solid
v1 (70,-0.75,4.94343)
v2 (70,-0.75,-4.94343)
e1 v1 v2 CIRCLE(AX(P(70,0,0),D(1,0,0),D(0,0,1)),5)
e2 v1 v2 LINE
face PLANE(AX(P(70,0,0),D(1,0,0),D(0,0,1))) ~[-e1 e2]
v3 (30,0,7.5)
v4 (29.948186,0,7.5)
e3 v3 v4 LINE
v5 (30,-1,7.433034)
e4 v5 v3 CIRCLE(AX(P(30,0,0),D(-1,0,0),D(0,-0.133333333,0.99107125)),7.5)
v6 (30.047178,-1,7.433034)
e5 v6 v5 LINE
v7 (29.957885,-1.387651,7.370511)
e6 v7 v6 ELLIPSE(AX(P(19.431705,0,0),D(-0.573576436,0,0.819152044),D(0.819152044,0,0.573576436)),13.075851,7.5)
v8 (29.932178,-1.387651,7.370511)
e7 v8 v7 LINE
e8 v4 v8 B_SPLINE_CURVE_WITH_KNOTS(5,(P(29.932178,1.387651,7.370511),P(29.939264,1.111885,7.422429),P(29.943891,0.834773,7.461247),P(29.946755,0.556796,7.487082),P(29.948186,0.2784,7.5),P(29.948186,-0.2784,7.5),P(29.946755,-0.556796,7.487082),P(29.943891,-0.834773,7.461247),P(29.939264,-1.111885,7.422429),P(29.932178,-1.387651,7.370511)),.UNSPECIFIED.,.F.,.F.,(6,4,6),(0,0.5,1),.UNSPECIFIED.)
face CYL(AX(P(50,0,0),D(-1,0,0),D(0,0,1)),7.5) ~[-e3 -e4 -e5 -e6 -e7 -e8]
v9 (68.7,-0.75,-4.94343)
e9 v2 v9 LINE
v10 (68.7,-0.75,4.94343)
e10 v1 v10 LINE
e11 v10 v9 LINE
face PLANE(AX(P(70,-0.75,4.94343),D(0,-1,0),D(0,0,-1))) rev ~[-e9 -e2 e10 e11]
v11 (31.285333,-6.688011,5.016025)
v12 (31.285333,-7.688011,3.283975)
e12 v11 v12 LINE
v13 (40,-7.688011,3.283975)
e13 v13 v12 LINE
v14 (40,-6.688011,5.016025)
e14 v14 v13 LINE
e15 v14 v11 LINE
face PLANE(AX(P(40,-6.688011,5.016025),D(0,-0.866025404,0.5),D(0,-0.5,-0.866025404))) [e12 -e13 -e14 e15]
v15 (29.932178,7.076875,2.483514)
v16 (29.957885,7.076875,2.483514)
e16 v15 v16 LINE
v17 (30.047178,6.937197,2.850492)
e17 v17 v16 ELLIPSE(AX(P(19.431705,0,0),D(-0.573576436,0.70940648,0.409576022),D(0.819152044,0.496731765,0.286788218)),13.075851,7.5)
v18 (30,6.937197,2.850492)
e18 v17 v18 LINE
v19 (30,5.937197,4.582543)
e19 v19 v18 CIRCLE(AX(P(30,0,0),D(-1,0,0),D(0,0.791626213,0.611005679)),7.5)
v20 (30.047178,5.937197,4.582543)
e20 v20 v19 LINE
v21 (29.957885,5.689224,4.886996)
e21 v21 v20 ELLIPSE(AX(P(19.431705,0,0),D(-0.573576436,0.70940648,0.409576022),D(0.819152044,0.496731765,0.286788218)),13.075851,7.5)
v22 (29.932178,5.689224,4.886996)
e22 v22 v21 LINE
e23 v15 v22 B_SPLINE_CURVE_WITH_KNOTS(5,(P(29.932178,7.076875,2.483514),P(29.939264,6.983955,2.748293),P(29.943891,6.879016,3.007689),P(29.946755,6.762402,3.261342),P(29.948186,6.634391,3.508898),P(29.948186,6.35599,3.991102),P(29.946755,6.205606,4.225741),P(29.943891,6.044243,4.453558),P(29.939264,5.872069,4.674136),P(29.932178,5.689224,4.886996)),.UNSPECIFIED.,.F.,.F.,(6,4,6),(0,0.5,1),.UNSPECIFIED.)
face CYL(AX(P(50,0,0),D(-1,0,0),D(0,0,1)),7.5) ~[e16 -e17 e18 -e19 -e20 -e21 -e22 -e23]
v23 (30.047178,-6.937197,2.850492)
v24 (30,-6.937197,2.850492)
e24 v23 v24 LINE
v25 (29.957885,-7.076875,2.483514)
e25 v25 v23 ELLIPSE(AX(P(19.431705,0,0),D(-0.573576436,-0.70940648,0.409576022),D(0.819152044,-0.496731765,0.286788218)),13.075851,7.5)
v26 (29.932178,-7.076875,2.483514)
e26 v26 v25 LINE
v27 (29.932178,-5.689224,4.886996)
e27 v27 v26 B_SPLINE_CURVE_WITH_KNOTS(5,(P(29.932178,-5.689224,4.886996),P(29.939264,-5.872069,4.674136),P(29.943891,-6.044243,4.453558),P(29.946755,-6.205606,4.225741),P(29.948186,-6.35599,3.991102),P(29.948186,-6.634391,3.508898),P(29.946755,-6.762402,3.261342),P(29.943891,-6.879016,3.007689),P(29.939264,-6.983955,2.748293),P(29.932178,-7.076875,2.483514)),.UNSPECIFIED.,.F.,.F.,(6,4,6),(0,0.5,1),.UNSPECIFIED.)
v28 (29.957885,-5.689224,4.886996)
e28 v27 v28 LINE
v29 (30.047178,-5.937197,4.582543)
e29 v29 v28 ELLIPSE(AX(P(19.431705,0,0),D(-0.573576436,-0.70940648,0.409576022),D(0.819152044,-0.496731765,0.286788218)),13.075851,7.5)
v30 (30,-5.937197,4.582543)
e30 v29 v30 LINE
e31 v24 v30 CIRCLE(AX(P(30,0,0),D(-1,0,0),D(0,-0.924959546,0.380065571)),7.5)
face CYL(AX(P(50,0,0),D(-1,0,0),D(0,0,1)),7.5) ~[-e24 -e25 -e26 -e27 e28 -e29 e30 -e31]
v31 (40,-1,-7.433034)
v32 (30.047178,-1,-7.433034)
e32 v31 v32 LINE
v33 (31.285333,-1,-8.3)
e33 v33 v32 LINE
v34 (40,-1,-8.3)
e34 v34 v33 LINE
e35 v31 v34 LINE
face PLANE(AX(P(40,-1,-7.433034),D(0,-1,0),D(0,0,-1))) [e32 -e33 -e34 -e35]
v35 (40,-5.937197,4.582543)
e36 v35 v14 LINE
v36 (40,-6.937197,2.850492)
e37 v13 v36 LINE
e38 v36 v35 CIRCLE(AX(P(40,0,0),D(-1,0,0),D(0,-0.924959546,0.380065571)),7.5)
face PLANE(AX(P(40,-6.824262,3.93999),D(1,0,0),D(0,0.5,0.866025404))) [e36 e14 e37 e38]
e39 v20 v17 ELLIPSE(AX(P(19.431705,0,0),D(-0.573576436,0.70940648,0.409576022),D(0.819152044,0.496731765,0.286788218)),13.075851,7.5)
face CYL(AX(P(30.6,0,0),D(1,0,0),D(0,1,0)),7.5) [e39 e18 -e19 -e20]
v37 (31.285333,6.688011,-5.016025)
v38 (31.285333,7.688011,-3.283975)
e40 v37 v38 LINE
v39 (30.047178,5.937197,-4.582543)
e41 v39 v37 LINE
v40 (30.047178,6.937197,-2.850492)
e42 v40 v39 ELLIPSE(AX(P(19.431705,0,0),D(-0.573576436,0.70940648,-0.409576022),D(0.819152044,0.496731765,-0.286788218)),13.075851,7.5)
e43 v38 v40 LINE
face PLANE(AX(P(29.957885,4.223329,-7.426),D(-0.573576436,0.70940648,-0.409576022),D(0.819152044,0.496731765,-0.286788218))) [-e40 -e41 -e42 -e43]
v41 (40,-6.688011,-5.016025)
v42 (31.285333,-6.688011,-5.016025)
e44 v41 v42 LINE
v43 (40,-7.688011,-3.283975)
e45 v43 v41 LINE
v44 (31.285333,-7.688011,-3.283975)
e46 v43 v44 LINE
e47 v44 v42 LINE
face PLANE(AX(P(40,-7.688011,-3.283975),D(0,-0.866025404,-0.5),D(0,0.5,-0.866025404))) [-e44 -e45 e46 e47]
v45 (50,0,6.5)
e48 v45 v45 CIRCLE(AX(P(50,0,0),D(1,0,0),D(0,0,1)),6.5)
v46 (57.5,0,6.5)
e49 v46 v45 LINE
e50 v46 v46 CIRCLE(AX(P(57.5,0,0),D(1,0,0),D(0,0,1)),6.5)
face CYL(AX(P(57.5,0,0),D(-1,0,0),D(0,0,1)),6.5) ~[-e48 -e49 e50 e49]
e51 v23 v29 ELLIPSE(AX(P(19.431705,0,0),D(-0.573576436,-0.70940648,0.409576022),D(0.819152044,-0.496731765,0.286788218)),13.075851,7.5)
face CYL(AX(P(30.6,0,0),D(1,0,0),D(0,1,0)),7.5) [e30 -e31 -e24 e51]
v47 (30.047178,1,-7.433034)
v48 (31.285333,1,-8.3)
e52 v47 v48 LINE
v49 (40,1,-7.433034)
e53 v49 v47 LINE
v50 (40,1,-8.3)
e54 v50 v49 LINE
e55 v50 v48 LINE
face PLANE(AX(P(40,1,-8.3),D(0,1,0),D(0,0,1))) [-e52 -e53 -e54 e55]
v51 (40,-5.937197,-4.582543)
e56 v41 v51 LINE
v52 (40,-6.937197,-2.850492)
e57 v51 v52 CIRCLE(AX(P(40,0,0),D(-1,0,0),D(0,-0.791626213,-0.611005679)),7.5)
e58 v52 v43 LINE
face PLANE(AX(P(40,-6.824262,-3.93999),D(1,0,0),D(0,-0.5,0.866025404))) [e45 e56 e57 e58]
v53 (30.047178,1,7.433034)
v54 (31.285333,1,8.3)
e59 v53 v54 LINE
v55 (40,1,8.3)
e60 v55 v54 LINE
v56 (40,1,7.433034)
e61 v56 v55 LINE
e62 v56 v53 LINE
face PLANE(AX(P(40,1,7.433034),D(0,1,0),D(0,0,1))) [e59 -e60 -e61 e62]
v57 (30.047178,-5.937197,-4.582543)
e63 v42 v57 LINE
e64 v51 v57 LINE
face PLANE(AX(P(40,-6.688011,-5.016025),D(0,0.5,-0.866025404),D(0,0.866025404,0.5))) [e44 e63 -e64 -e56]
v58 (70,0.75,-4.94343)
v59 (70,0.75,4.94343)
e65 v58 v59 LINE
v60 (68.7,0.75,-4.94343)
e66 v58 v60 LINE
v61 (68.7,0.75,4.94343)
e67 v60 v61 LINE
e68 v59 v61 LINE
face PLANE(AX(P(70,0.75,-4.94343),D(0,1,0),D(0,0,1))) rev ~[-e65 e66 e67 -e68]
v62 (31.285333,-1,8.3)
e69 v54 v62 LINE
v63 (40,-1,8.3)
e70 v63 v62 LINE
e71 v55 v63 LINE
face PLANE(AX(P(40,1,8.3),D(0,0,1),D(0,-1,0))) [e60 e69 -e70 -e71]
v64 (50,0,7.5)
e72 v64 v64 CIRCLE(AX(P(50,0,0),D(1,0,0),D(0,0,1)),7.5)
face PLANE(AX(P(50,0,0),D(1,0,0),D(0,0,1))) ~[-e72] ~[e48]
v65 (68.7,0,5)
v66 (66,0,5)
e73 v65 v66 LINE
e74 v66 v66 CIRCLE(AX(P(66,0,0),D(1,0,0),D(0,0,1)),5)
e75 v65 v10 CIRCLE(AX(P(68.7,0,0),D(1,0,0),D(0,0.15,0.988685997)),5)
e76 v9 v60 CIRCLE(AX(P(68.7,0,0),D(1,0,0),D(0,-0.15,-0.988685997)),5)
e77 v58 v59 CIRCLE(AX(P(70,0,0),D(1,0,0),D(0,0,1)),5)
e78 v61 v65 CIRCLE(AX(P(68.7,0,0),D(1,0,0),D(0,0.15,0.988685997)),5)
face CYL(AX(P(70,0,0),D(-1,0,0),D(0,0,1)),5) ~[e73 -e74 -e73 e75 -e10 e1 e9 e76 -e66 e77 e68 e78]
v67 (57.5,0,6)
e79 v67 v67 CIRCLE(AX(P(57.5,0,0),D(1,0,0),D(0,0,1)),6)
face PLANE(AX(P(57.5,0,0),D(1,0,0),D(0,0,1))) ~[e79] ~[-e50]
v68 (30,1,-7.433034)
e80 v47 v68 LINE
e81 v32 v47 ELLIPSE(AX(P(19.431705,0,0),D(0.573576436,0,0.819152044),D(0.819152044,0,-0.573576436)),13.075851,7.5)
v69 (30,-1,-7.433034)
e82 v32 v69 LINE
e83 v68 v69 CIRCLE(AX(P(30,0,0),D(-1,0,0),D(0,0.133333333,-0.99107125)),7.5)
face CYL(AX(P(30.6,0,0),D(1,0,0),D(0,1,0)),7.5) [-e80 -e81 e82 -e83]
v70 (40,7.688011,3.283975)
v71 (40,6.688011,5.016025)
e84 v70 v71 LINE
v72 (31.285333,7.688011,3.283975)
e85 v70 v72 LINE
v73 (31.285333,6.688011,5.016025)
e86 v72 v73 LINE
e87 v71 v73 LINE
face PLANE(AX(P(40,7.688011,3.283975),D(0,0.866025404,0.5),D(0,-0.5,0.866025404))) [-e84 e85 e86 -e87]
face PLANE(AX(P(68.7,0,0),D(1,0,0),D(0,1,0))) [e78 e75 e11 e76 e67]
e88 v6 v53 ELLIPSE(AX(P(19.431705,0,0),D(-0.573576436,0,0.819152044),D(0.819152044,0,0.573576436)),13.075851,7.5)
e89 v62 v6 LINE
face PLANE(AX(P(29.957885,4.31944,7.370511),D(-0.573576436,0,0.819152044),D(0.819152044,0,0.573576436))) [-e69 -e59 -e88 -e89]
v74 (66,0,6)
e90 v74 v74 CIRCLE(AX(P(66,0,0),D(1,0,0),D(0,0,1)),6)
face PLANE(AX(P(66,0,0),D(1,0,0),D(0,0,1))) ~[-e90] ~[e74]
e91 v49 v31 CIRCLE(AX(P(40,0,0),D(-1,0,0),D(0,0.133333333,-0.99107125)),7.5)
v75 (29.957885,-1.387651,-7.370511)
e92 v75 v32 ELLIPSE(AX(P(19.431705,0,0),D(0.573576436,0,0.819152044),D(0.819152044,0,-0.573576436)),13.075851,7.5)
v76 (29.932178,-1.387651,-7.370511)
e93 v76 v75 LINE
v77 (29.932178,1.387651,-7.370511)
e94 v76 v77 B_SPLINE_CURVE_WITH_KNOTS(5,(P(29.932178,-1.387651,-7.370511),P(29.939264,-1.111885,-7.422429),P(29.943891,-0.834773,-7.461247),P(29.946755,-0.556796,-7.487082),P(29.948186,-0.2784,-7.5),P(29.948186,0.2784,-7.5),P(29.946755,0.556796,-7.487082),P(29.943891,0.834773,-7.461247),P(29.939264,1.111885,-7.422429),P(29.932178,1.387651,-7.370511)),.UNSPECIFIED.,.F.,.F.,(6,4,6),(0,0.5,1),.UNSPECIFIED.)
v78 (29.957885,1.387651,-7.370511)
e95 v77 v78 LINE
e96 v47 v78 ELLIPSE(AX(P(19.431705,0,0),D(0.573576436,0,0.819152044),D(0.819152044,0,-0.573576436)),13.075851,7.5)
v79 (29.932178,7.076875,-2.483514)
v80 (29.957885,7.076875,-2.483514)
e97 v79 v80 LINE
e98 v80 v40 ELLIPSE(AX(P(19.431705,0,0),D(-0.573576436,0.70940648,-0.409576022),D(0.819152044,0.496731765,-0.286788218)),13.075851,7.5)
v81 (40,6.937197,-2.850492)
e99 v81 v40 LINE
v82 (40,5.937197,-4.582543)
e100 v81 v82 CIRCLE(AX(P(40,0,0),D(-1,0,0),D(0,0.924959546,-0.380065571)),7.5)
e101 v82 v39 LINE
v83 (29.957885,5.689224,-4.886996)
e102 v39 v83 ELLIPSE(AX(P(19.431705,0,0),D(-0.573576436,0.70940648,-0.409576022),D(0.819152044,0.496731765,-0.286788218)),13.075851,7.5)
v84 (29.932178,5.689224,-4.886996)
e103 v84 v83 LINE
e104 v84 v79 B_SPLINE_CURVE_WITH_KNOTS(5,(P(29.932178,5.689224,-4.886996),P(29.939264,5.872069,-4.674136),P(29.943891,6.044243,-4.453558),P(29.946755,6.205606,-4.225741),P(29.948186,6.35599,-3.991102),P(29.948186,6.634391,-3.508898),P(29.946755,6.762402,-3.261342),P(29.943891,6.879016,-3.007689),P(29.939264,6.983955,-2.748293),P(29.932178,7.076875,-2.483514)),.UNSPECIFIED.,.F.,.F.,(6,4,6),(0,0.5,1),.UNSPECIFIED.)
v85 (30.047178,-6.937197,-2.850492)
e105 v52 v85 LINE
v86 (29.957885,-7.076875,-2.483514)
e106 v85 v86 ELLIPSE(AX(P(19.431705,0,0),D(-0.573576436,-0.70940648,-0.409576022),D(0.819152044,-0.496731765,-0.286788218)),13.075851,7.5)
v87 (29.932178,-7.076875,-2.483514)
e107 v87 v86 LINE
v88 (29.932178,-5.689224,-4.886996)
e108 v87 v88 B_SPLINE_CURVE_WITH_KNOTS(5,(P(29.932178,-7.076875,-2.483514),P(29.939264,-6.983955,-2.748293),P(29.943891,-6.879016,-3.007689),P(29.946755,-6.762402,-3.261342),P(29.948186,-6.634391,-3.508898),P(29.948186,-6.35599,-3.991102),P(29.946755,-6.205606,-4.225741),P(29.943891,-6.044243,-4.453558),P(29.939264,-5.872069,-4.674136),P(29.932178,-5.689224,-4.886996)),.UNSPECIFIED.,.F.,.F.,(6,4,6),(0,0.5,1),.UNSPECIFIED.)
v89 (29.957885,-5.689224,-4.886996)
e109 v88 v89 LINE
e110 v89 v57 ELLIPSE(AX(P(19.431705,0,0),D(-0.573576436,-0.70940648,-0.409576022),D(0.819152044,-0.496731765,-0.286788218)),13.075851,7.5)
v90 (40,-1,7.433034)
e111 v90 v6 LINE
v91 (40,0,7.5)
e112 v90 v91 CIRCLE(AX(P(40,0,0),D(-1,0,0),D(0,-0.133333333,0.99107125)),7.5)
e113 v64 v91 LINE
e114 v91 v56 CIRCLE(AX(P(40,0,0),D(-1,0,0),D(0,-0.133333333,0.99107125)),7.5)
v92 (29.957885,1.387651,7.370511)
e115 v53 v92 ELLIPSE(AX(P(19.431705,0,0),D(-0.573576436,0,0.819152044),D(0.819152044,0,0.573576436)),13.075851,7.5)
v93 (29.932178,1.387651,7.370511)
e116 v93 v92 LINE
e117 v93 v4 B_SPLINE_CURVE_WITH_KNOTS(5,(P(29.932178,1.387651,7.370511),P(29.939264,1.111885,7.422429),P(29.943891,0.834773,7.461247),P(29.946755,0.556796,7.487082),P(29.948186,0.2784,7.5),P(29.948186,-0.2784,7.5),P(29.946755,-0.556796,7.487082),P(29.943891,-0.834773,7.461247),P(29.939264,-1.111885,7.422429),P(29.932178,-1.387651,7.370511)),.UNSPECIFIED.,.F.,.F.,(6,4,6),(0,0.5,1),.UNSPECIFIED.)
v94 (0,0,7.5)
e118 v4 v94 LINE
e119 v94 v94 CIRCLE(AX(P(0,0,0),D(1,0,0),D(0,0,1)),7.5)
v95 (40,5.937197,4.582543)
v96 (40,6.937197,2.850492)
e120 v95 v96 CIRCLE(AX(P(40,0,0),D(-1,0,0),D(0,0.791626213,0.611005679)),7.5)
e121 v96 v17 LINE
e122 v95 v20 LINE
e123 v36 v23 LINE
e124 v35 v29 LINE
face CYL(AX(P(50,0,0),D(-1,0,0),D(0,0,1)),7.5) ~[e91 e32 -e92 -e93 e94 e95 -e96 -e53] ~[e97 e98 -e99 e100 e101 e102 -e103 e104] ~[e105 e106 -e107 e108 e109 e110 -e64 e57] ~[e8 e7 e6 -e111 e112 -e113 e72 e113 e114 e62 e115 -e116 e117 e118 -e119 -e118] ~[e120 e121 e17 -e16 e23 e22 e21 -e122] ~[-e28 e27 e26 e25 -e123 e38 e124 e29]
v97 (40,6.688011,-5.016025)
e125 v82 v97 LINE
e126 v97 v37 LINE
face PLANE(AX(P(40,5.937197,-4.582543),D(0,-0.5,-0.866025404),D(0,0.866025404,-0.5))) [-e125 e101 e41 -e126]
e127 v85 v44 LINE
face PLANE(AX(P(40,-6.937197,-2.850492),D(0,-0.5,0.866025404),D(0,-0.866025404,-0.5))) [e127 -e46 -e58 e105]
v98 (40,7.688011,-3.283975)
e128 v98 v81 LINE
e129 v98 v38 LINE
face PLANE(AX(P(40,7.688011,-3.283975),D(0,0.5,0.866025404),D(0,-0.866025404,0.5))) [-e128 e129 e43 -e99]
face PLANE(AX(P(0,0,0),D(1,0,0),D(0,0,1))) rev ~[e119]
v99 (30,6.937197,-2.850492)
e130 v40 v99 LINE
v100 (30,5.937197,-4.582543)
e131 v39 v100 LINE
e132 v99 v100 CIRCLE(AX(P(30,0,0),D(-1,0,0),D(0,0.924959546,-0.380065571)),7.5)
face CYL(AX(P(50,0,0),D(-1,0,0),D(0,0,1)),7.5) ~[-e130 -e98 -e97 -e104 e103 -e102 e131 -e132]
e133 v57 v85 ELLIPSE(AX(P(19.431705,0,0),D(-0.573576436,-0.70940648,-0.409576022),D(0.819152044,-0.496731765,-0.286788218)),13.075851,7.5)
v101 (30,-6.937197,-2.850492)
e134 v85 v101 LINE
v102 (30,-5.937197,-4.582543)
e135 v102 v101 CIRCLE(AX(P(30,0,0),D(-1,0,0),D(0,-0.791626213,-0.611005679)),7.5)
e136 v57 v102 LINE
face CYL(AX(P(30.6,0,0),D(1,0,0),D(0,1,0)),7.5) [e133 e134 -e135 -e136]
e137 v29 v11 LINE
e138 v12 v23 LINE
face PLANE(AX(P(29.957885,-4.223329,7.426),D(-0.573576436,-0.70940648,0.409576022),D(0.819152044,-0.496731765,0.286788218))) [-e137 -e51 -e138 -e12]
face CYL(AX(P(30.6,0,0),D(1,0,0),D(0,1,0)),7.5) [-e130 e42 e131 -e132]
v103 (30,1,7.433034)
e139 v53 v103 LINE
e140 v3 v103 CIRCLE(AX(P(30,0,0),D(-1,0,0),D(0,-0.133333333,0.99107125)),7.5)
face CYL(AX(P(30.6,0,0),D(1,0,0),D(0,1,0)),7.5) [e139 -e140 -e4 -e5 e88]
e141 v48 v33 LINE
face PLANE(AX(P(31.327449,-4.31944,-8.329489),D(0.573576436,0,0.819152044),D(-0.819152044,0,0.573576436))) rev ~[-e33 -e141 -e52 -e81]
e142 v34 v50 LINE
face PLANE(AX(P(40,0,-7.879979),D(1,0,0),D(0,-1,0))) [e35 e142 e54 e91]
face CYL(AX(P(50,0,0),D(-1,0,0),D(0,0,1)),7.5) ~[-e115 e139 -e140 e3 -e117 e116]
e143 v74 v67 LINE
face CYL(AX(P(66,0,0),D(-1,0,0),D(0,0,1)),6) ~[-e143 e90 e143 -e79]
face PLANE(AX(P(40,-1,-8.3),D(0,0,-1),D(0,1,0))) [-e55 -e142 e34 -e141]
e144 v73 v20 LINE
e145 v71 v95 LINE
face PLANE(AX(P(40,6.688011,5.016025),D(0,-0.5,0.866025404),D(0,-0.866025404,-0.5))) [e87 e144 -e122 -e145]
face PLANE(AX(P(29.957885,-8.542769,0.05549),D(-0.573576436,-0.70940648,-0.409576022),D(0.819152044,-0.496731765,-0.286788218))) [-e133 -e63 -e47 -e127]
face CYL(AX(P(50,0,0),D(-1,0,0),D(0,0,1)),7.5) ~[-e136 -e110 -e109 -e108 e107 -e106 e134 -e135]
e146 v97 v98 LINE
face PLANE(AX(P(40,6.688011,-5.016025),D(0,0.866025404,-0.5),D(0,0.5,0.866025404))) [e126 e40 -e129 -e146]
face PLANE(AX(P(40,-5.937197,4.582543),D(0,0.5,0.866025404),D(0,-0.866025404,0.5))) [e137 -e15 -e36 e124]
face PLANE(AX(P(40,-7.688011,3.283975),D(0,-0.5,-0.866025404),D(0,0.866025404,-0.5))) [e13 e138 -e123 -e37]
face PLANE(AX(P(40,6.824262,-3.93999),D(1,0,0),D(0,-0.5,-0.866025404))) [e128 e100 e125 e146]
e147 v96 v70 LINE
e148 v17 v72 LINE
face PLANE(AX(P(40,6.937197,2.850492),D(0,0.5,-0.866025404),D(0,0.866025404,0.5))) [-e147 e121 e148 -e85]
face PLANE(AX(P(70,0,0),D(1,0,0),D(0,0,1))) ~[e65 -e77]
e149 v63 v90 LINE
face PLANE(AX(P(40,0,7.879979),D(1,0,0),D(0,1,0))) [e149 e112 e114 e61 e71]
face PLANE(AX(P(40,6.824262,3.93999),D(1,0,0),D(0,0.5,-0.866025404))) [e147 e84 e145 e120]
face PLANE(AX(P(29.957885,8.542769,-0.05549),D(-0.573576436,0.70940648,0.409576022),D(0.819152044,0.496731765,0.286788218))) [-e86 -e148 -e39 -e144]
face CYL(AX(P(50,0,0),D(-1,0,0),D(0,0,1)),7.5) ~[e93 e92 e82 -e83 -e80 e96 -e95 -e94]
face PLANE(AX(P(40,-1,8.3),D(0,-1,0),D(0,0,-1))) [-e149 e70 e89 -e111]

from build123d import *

# Parameters (mm, degrees)
F3_DEPTH        = 1.3
F5_START        = -10
F5_DEPTH        = 10
F5_COPIES_COUNT = 6
F6_T4_DEPTH     = 8.638880276
F6_S5_R         = 7.5
F6_T6_DEPTH     = 6
F6_T10_DEPTH    = 8.638880276
F6_S11_R        = 7.5
F6_T12_DEPTH    = 6
F6_T16_DEPTH    = 8.638880276
F6_S17_R        = 7.5
F6_T18_DEPTH    = 6
F6_T22_DEPTH    = 8.638880276
F6_S23_R        = 7.5
F6_T24_DEPTH    = 6
F6_T28_DEPTH    = 8.638880276
F6_S29_R        = 7.5
F6_T30_DEPTH    = 6
F6_T34_DEPTH    = 8.638880276
F6_S35_R        = 7.5
F6_T36_DEPTH    = 6


# Not quite as in the source:
# - a fillet or chamfer that OpenCascade refuses, or shapes differently, is made with other operations: its cross-section is extruded or revolved along the edge and cut away or added
# - a pattern or mirror of a feature is missing from the dataset's text; its kind, count and spacing are read off the source's solid
# - a feature names something its author has since deleted; it is built from what else it names


with BuildPart() as f1:
    # F0 (on Front) → F1 (revolve)
    with BuildSketch(Plane.XZ):
        Polygon((70, 5), (66, 5), (66, 6), (57.5, 6), (57.5, 6.5), (50, 6.5), (50, 7.5), (0, 7.5), (0, 0), (70, 0), align=None)
    revolve(axis=Axis((22.5240401924, 0, 0), (1, 0, 0)))

    # F2 (on face) → F3 (cut)
    with BuildSketch(Plane.YZ.offset(70)):
        with BuildLine():
            ThreePointArc((0.75, 4.9434299833), (0, 5), (-0.75, 4.9434299833))
            Line((-0.75, 4.9434299833), (-0.75, -4.9434299833))
            ThreePointArc((-0.75, -4.9434299833), (0, -5), (0.75, -4.9434299833))
            Line((0.75, -4.9434299833), (0.75, 4.9434299833))
        make_face()
    extrude(amount=-F3_DEPTH, mode=Mode.SUBTRACT)

    # F4 (on face) → F5 (join)
    with BuildSketch(Plane.YZ.offset(50).offset(F5_START)):
        with BuildLine():
            ThreePointArc((-1, 7.4330343737), (0, 7.5), (1, 7.4330343737))
            Line((1, 7.4330343737), (1, 8.3))
            Line((1, 8.3), (-1, 8.3))
            Line((-1, 8.3), (-1, 7.4330343737))
        make_face()
    f5 = extrude(amount=-F5_DEPTH)

    # F5_copies: F5 ×6 about axis
    f5_copies_axis = Axis((0, 0, 0), (1, 0, 0))
    for i in range(1, F5_COPIES_COUNT):
        add(f5.rotate(f5_copies_axis, i * 360 / F5_COPIES_COUNT))

    # F6: chamfer of 0.9 x 1.2853332061 on 6 edges, made by hand


with BuildPart() as f6_tool2:
    # F6_s3 → F6_t4 (new body)
    with BuildSketch(Plane.XZ.offset(-4.319440138)):
        with BuildLine():
            Line((29.9578846671, 7.3705105264), (31.327448539, 8.3294894736))
            Line((31.327448539, 8.3294894736), (31.327448539, 8.3551961377))
            ThreePointArc((31.327448539, 8.3551961377), (30.6637242695, 8.3257066641), (30, 8.3257066641))
            Line((30, 8.3257066641), (29.9742933359, 8.3))
            ThreePointArc((29.9742933359, 8.3), (29.9742933359, 7.8352552632), (29.9321780029, 7.3705105264))
            Line((29.9321780029, 7.3705105264), (29.9578846671, 7.3705105264))
        make_face()
    extrude(amount=F6_T4_DEPTH)

    # F6_s5 → F6_t6 (cut, symmetric)
    with BuildSketch(Plane.YZ.offset(30.6)):
        Circle(F6_S5_R)
    extrude(amount=F6_T6_DEPTH, both=True, mode=Mode.SUBTRACT)


with BuildPart() as f1_1:
    add(f1.part)

    # F6_t1: cut F6_tool2
    add(f6_tool2.part, mode=Mode.SUBTRACT)


with BuildPart() as f6_tool8:
    # F6_s9 → F6_t10 (new body)
    with BuildSketch(Plane.XZ.offset(4.319440138)):
        with BuildLine():
            Line((31.327448539, -8.3294894736), (29.9578846671, -7.3705105264))
            Line((29.9578846671, -7.3705105264), (29.9321780029, -7.3705105264))
            ThreePointArc((29.9321780029, -7.3705105264), (29.9742933359, -7.8352552632), (29.9742933359, -8.3))
            Line((29.9742933359, -8.3), (30, -8.3257066641))
            ThreePointArc((30, -8.3257066641), (30.6637242695, -8.3257066641), (31.327448539, -8.3551961377))
            Line((31.327448539, -8.3551961377), (31.327448539, -8.3294894736))
        make_face()
    extrude(amount=-F6_T10_DEPTH)

    # F6_s11 → F6_t12 (cut, symmetric)
    with BuildSketch(Plane.YZ.offset(30.6)):
        Circle(F6_S11_R)
    extrude(amount=F6_T12_DEPTH, both=True, mode=Mode.SUBTRACT)


with BuildPart() as f1_2:
    add(f1_1.part)

    # F6_t7: cut F6_tool8
    add(f6_tool8.part, mode=Mode.SUBTRACT)


with BuildPart() as f6_tool14:
    # F6_s15 → F6_t16 (new body)
    with BuildSketch(Plane(origin=(0, -2.159720069, 3.7407448896), x_dir=(1, 0, 0), z_dir=(0, 0.5, -0.8660254038))):
        with BuildLine():
            Line((29.9578846671, 7.3705105264), (31.327448539, 8.3294894736))
            Line((31.327448539, 8.3294894736), (31.327448539, 8.3551961377))
            ThreePointArc((31.327448539, 8.3551961377), (30.6637242695, 8.3257066641), (30, 8.3257066641))
            Line((30, 8.3257066641), (29.9742933359, 8.3))
            ThreePointArc((29.9742933359, 8.3), (29.9742933359, 7.8352552632), (29.9321780029, 7.3705105264))
            Line((29.9321780029, 7.3705105264), (29.9578846671, 7.3705105264))
        make_face()
    extrude(amount=F6_T16_DEPTH)

    # F6_s17 → F6_t18 (cut, symmetric)
    with BuildSketch(Plane.YZ.offset(30.6)):
        Circle(F6_S17_R)
    extrude(amount=F6_T18_DEPTH, both=True, mode=Mode.SUBTRACT)


with BuildPart() as f1_3:
    add(f1_2.part)

    # F6_t13: cut F6_tool14
    add(f6_tool14.part, mode=Mode.SUBTRACT)


with BuildPart() as f6_tool20:
    # F6_s21 → F6_t22 (new body)
    with BuildSketch(Plane(origin=(0, 2.159720069, 3.7407448896), x_dir=(1, 0, 0), z_dir=(0, -0.5, -0.8660254038))):
        with BuildLine():
            Line((29.9578846671, 7.3705105264), (31.327448539, 8.3294894736))
            Line((31.327448539, 8.3294894736), (31.327448539, 8.3551961377))
            ThreePointArc((31.327448539, 8.3551961377), (30.6637242695, 8.3257066641), (30, 8.3257066641))
            Line((30, 8.3257066641), (29.9742933359, 8.3))
            ThreePointArc((29.9742933359, 8.3), (29.9742933359, 7.8352552632), (29.9321780029, 7.3705105264))
            Line((29.9321780029, 7.3705105264), (29.9578846671, 7.3705105264))
        make_face()
    extrude(amount=F6_T22_DEPTH)

    # F6_s23 → F6_t24 (cut, symmetric)
    with BuildSketch(Plane.YZ.offset(30.6)):
        Circle(F6_S23_R)
    extrude(amount=F6_T24_DEPTH, both=True, mode=Mode.SUBTRACT)


with BuildPart() as f1_4:
    add(f1_3.part)

    # F6_t19: cut F6_tool20
    add(f6_tool20.part, mode=Mode.SUBTRACT)


with BuildPart() as f6_tool26:
    # F6_s27 → F6_t28 (new body)
    with BuildSketch(Plane(origin=(0, -2.159720069, -3.7407448896), x_dir=(1, 0, 0), z_dir=(0, 0.5, 0.8660254038))):
        with BuildLine():
            Line((29.9578846671, 7.3705105264), (31.327448539, 8.3294894736))
            Line((31.327448539, 8.3294894736), (31.327448539, 8.3551961377))
            ThreePointArc((31.327448539, 8.3551961377), (30.6637242695, 8.3257066641), (30, 8.3257066641))
            Line((30, 8.3257066641), (29.9742933359, 8.3))
            ThreePointArc((29.9742933359, 8.3), (29.9742933359, 7.8352552632), (29.9321780029, 7.3705105264))
            Line((29.9321780029, 7.3705105264), (29.9578846671, 7.3705105264))
        make_face()
    extrude(amount=F6_T28_DEPTH)

    # F6_s29 → F6_t30 (cut, symmetric)
    with BuildSketch(Plane.YZ.offset(30.6)):
        Circle(F6_S29_R)
    extrude(amount=F6_T30_DEPTH, both=True, mode=Mode.SUBTRACT)


with BuildPart() as f1_5:
    add(f1_4.part)

    # F6_t25: cut F6_tool26
    add(f6_tool26.part, mode=Mode.SUBTRACT)


with BuildPart() as f6_tool32:
    # F6_s33 → F6_t34 (new body)
    with BuildSketch(Plane(origin=(0, 2.159720069, -3.7407448896), x_dir=(1, 0, 0), z_dir=(0, -0.5, 0.8660254038))):
        with BuildLine():
            Line((29.9578846671, 7.3705105264), (31.327448539, 8.3294894736))
            Line((31.327448539, 8.3294894736), (31.327448539, 8.3551961377))
            ThreePointArc((31.327448539, 8.3551961377), (30.6637242695, 8.3257066641), (30, 8.3257066641))
            Line((30, 8.3257066641), (29.9742933359, 8.3))
            ThreePointArc((29.9742933359, 8.3), (29.9742933359, 7.8352552632), (29.9321780029, 7.3705105264))
            Line((29.9321780029, 7.3705105264), (29.9578846671, 7.3705105264))
        make_face()
    extrude(amount=F6_T34_DEPTH)

    # F6_s35 → F6_t36 (cut, symmetric)
    with BuildSketch(Plane.YZ.offset(30.6)):
        Circle(F6_S35_R)
    extrude(amount=F6_T36_DEPTH, both=True, mode=Mode.SUBTRACT)


with BuildPart() as f1_6:
    add(f1_5.part)

    # F6_t31: cut F6_tool32
    add(f6_tool32.part, mode=Mode.SUBTRACT)


solid = f1_6.part
